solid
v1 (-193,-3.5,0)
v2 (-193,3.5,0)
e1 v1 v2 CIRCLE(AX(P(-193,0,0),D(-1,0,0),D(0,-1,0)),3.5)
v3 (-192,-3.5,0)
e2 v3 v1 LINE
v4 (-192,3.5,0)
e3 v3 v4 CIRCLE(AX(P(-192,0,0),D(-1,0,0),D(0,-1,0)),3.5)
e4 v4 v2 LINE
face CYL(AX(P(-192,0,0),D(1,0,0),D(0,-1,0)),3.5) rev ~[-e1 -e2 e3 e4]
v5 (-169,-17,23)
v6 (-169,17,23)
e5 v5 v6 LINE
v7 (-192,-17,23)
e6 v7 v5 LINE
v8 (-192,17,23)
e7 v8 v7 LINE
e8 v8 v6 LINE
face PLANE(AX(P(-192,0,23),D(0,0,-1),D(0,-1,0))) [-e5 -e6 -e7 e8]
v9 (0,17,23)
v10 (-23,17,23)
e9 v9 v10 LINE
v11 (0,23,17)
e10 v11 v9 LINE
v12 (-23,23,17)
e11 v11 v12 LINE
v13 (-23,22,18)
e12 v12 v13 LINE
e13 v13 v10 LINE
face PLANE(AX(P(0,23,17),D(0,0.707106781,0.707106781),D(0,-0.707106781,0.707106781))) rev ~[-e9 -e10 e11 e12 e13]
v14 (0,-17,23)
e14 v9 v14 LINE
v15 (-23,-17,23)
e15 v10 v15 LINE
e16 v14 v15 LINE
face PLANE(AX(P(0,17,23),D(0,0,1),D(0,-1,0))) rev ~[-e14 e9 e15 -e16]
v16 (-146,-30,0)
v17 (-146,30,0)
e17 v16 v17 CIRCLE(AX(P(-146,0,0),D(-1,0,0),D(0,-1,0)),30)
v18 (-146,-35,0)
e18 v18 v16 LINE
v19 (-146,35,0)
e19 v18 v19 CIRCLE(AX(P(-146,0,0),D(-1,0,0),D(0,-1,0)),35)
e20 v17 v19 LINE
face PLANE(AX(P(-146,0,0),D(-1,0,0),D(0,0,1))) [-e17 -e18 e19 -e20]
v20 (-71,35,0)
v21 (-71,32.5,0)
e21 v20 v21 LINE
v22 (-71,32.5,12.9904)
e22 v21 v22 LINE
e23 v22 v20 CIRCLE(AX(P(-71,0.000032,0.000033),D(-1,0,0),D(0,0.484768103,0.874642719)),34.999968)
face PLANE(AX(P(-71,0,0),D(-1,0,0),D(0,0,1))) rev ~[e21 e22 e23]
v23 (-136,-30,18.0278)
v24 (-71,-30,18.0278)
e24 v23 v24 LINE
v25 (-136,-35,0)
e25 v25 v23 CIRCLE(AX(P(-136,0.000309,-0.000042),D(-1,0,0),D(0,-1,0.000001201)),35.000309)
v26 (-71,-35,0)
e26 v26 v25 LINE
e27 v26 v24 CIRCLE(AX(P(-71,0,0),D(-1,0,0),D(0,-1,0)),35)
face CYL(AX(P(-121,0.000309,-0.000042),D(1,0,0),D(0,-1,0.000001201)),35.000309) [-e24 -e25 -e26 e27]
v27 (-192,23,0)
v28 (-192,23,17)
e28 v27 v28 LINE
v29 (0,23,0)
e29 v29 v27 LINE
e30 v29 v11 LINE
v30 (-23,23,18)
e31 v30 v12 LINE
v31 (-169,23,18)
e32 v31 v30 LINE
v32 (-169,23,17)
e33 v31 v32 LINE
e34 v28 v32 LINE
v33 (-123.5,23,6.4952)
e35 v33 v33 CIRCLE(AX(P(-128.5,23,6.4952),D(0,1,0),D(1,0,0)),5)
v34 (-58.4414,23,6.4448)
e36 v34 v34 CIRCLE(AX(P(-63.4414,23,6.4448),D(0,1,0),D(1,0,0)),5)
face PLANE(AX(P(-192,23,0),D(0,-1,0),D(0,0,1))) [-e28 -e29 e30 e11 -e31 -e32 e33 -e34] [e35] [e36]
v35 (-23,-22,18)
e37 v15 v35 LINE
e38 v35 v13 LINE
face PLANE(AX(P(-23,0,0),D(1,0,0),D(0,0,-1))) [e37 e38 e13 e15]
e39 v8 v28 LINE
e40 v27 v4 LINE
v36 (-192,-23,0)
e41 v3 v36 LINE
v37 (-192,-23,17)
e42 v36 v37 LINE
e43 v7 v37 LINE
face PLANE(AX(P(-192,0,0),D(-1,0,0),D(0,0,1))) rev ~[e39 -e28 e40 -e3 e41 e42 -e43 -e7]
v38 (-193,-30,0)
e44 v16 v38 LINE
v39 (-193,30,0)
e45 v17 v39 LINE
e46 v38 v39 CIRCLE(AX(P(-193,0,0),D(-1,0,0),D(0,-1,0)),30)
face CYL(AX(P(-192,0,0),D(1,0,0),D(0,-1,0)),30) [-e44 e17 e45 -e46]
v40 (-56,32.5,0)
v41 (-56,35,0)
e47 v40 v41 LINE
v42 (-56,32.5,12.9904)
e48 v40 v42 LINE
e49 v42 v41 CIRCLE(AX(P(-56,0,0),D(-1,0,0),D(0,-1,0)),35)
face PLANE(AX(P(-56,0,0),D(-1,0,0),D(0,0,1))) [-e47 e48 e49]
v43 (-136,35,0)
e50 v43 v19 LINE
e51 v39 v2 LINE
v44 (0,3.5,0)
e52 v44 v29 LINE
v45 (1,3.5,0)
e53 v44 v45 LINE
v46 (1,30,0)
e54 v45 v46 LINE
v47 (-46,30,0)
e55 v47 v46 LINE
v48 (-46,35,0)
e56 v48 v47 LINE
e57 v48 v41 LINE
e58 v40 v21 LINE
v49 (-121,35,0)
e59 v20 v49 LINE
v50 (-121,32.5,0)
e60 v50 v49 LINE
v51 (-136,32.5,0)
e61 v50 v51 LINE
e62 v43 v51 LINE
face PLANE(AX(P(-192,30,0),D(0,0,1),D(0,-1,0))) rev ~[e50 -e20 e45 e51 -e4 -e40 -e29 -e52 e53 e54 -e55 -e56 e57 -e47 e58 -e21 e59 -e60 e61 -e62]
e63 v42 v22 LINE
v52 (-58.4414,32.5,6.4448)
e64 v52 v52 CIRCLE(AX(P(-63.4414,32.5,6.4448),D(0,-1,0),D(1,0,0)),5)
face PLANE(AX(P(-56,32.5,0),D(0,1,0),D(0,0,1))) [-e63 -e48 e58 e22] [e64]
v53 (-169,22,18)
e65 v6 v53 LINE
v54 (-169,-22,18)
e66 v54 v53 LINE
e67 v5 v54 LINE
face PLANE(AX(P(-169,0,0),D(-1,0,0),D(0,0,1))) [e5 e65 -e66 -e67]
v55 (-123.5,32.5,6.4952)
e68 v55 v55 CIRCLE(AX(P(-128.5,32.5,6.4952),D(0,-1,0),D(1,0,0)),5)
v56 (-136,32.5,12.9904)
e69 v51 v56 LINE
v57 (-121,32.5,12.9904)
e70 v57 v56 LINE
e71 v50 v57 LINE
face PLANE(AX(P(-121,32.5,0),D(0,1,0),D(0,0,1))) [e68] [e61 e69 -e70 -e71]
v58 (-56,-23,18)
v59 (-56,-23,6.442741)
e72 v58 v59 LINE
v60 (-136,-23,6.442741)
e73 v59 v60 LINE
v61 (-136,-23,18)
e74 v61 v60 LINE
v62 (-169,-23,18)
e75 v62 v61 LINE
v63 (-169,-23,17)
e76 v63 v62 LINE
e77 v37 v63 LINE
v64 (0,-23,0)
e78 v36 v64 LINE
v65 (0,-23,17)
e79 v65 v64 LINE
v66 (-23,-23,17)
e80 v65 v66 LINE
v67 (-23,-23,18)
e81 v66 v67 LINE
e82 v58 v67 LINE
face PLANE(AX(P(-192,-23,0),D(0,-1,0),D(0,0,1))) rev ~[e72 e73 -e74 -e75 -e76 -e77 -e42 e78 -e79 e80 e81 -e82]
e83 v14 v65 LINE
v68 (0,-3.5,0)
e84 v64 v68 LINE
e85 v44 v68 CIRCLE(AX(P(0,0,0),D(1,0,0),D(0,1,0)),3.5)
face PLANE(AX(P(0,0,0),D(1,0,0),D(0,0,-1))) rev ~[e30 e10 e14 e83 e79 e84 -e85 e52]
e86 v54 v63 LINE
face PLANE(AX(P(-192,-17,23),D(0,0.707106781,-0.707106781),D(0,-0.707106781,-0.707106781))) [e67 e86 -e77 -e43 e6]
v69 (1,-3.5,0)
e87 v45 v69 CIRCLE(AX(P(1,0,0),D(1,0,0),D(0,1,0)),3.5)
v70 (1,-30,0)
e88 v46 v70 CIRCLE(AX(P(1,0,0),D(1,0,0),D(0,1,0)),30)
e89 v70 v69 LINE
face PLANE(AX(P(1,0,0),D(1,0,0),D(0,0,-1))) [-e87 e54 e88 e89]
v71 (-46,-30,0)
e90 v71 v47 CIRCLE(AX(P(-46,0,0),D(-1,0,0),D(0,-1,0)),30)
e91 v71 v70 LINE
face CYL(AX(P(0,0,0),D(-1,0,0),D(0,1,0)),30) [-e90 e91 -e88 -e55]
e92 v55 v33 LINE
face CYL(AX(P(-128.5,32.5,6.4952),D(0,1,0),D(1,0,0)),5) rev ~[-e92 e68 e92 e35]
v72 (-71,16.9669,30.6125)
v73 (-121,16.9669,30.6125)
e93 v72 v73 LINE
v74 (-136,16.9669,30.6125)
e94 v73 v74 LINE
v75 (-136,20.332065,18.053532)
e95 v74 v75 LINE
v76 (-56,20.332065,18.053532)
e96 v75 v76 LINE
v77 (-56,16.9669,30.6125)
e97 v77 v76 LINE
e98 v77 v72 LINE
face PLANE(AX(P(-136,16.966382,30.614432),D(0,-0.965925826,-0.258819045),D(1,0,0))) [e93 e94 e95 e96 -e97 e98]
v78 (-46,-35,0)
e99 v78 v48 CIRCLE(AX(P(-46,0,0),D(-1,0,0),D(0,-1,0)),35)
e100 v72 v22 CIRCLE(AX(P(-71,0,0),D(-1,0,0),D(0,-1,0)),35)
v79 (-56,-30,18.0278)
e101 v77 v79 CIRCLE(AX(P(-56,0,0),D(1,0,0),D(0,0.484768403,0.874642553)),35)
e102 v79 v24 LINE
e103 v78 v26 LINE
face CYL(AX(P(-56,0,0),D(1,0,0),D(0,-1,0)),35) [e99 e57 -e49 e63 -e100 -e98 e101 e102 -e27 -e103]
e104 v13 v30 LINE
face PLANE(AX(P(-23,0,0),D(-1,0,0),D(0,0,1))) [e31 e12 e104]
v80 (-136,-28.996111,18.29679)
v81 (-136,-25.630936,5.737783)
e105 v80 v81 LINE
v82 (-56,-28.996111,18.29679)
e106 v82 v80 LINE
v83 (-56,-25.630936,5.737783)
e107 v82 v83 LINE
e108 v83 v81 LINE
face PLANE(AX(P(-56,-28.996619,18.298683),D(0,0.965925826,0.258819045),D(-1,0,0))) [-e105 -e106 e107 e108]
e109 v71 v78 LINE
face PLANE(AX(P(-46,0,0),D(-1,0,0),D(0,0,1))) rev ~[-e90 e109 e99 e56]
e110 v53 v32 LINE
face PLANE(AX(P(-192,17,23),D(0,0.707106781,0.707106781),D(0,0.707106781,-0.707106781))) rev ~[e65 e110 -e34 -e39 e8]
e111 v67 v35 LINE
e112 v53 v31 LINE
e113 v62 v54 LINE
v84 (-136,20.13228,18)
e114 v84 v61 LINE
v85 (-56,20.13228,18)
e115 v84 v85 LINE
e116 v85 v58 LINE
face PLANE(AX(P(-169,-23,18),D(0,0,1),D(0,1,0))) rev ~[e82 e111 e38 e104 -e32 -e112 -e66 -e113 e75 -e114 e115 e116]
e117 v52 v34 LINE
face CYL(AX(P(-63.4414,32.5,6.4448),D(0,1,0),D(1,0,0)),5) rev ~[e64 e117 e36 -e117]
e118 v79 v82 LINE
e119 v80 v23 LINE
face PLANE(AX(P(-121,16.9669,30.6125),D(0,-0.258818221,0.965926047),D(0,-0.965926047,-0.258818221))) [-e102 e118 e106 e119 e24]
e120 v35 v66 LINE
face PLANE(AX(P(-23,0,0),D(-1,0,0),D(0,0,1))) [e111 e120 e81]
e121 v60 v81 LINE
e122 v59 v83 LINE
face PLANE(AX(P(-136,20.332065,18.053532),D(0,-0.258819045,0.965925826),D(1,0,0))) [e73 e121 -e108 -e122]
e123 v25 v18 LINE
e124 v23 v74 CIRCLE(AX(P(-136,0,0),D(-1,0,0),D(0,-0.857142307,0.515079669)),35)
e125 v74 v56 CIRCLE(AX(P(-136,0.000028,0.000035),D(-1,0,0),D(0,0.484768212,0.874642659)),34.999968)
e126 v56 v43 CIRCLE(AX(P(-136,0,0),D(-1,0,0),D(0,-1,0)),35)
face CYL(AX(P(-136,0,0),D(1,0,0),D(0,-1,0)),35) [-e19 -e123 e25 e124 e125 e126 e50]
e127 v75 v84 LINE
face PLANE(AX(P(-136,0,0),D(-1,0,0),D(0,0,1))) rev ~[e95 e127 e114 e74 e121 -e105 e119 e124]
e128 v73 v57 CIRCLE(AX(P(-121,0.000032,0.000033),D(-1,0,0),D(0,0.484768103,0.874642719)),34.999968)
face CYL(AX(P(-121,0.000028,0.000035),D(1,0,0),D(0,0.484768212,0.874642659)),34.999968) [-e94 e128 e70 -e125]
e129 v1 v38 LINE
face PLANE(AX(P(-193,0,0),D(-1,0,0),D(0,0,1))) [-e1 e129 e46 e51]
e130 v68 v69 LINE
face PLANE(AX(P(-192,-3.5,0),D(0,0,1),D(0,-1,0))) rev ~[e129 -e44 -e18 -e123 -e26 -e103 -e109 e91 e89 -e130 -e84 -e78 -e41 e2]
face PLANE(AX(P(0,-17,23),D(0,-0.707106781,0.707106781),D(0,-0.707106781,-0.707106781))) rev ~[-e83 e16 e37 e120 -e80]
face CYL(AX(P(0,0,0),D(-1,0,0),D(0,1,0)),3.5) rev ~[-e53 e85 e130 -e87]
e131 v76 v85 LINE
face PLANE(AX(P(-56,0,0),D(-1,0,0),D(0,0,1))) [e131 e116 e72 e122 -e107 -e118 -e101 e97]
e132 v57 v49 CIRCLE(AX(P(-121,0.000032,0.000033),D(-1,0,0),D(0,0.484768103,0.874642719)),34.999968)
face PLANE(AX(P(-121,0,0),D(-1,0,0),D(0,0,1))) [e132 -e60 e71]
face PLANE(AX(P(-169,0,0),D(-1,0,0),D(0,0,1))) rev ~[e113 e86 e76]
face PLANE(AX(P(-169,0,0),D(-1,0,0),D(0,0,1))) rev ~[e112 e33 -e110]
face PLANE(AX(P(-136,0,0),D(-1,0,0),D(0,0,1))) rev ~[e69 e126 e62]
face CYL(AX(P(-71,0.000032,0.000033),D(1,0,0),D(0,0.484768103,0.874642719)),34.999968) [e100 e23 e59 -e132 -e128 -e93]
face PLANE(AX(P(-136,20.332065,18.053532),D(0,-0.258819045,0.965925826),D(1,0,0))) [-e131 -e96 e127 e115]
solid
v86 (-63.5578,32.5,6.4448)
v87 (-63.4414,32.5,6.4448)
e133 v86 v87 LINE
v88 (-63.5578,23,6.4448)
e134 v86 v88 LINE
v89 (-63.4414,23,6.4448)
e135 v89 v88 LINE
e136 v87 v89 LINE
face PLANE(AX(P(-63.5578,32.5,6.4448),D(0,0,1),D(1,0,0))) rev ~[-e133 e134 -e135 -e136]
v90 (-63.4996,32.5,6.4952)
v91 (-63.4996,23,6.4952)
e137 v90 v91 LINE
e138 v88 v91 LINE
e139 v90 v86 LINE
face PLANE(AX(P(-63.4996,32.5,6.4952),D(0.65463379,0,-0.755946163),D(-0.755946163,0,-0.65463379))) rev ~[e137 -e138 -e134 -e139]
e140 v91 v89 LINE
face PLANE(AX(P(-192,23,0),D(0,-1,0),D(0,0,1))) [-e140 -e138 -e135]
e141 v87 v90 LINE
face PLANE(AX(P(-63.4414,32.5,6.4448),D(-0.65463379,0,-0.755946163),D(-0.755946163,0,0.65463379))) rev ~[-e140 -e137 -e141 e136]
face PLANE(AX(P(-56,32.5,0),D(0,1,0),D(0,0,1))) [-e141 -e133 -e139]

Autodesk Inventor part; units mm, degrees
ref_plane "YZ Plane" through (0, 0, 0) normal (1, 0, 0) x (0, 1, 0)
ref_plane "XZ Plane" through (0, 0, 0) normal (0, 1, 0) x (-1, 0, 0)
ref_plane "XY Plane" through (0, 0, 0) normal (0, 0, 1) x (1, 0, 0)
sketch "Skizze1" plane through (0, 0, 0) normal (1, 0, 0) x (0, 1, 0)
  arc A0 (30, 0) -> (-30, 0) centre (0, 0) ccw
  arc A1 (3.5, 0) -> (-3.5, 0) centre (0, 0) ccw
  line L0 (-30, 0) -> (-3.5, 0)
  line L1 (3.5, 0) -> (30, 0)
  dimension "d0" = 60
  dimension "d1" = 7
extrude "Motorloch R" add sketch "Skizze1" along normal blind 1
sketch "Skizze3" plane through (0, 0, 0) normal (-1, 0, 0) x (0, 0, 1)
  arc A0 (0, -30) -> (0, 30) centre (0, 0) ccw
  line L0 (0, 30) -> (0, -30)
extrude "Grundkörper R Teil A" add sketch "Skizze3" along normal blind 46
sketch "Skizze4" plane through (-46, 0, 0) normal (-1, 0, 0) x (0, 0, 1)
  arc A0 (0, -35) -> (0, 35) centre (0, 0) ccw
  line L0 (0, 35.8217) -> (0, -35)
  line L1 (0, 3.5) -> (0, 30) projected
  dimension "d8" = 70
extrude "Extrusion4" add sketch "Skizze4" along normal blind 10
sketch "Skizze5" plane through (-56, 0, 0) normal (-1, 0, 0) x (0, 0, 1)
  line L0 (0, -30) -> (0, -35) projected
  line L1 (0, 32.5) -> (0, -35)
  line L2 (0, 35) -> (0, 30) projected
  line L3 (0, 32.5) -> (12.9904, 32.5)
  arc A0 (0, -35) -> (0, 35) centre (0, 0) ccw projected
  line L4 (0, -35) -> (0, -30)
  line L5 (0, -30) -> (0, -3.5) projected
  line L6 (18.0278, -30) -> (30.6125, 16.9669)
  line L7 (18.0278, -30) -> (66.6515, -30) construction
  arc A1 (0, -35) -> (18.0278, -30) centre (0, 0) ccw
  arc A2 (30.6125, 16.9669) -> (12.9904, 32.5) centre (0, 0) ccw
  dimension "d11" = 75
extrude "Extrusion5" add sketch "Skizze5" along normal blind 15 contours L1 L3 A0 L6 L0
sketch "Skizze6" plane through (-71, 0, 0) normal (-1, 0, 0) x (0, 0, 1)
  line L0 (0, 32.5) -> (0, -35) projected
  line L1 (0, 35) -> (0, -35)
  line L2 (18.0278, -30) -> (30.6125, 16.9669) projected
  line L3 (30.6125, 16.9669) -> (18.0278, -30)
  arc A0 (0, -35) -> (18.0278, -30) centre (0, 0) ccw
  arc A1 (30.6125, 16.9669) -> (0, 35) centre (0, 0) ccw
extrude "Extrusion6" add sketch "Skizze6" along normal blind 50
sketch "Skizze8" plane through (-121, 0, 0) normal (-1, 0, 0) x (0, 0, 1)
  line L0 (0, 32.5) -> (0, -35)
  line L1 (0, -30) -> (0, -3.5) projected
  line L2 (30.6125, 16.9669) -> (18.0278, -30) projected
  line L3 (30.6125, 16.9669) -> (18.0278, -30)
  line L4 (0, 32.5) -> (12.9904, 32.5) projected
  line L5 (0, 32.5) -> (12.9904, 32.5)
  arc A0 (0, -35) -> (18.0278, -30) centre (0, 0) ccw
  arc A1 (30.6125, 16.9669) -> (12.9904, 32.5) centre (0, 0) ccw
extrude "Extrusion8" add sketch "Skizze8" along normal blind 15
sketch "Skizze9" plane through (-136, 0, 0) normal (-1, 0, 0) x (0, 0, 1)
  arc A0 (0, -35) -> (0, 35) centre (0, 0) ccw
  line L0 (0, 35) -> (0, -35)
  line L1 (0, -30) -> (0, -3.5) projected
extrude "Extrusion9" add sketch "Skizze9" along normal blind 10
sketch "Skizze10" plane through (-146, 0, 0) normal (-1, 0, 0) x (0, 0, 1)
  arc A0 (0, -30) -> (0, 30) centre (0, 0) ccw
  line L0 (0, -30) -> (0, -3.5) projected
  line L1 (0, 30) -> (0, -30)
extrude "Extrusion10" add sketch "Skizze10" along normal blind 46
sketch "Skizze12" plane through (1, 0, 0) normal (1, 0, 0) x (0, 0, -1)
  arc A0 (0, 30) -> (0, -30) centre (0, 0) ccw
  line L0 (0, -30) -> (0, -35) projected
  arc A1 (0, 3.5) -> (0, -3.5) centre (0, 0) ccw
  line L1 (0, -30) -> (0, -3.5)
  line L2 (0, 3.5) -> (0, 30)
extrude "Extrusion12" cut sketch "Skizze12" against normal blind 1
sketch "Skizze13" plane through (-192, 0, 0) normal (-1, 0, 0) x (0, 0, 1)
  line L0 (0, 0) -> (0, -23)
  line L1 (0, 30) -> (0, -30) projected
  line L2 (0, -23) -> (17, -23)
  line L3 (0, 0) -> (0, 23)
  line L4 (0, 23) -> (17, 23)
  line L5 (23, 0) -> (23, -17)
  line L6 (23, 0) -> (23, 17)
  line L7 (23, 17) -> (17, 23)
  line L8 (23, -17) -> (17, -23)
extrude "Extrusion13" cut sketch "Skizze13" against normal blind 23
sketch "Skizze14" plane through (0, 0, 0) normal (1, 0, 0) x (0, 0, -1)
  line L0 (0, -23) -> (0, 23) projected
  line L1 (0, 0) -> (0, 23)
  line L2 (0, 23) -> (-17, 23) projected
  line L3 (0, 23) -> (-17, 23)
  line L4 (-17, 23) -> (-23, 17)
  line L5 (-23, 17) -> (-23, -17) projected
  line L6 (-23, 17) -> (-23, -17)
  line L7 (-23, -17) -> (-17, -23)
  line L8 (-17, -23) -> (0, -23)
  line L9 (0, -23) -> (0, 0)
extrude "Extrusion14" cut sketch "Skizze14" against normal blind 23
sketch "Skizze16" plane through (-169, 0, 0) normal (-1, 0, 0) x (0, 0, 1)
  line L0 (0, -23) -> (0, -30) projected
  line L1 (0, -23) -> (18, -23)
  line L2 (18, -23) -> (18, 23)
  line L3 (18, 23) -> (0, 23)
  line L4 (0, 23) -> (0, -23)
  point P0 (0, 0)
  dimension "d40" = 18
  dimension "d41" = 46
extrude "Extrusion15" cut sketch "Skizze16" against normal blind 146
sketch "Skizze17" plane through (-136, 16.9669, 30.6125) normal (0, -0.258819, 0.9659258) x (1, 0, 0)
  line L0 (0, 0) -> (0, -48.6237) projected
  line L1 (80, 0) -> (80, -48.6237) projected
  line L2 (0, 0) -> (80, 0)
  line L3 (80, 0) -> (80, -47.5844)
  line L4 (80, -47.5844) -> (0, -47.5844)
  line L5 (0, -47.5844) -> (0, 0)
  point P0 (136, -24.3118)
extrude "Extrusion16" cut sketch "Skizze17" against normal blind 13
sketch "Skizze18" plane through (-56, 32.5, 12.9904) normal (0, 1, 0) x (1, 0, 0)
  line L0 (0, 0) -> (-15, 0) projected
  line L1 (10, 12.9904) -> (-90, 12.9904) projected
  line L2 (-80, 6.5456) -> (0, 6.5456) projected
  circle A0 centre (-7.4414, 6.5456) radius 5
  line L3 (-7.4996, 6.4952) -> (-7.5578, 6.5456)
  line L4 (-7.4414, 6.5456) -> (-7.4996, 6.4952)
  line L5 (-65, 12.9904) -> (-65, 0) projected
  circle A1 centre (-72.5, 6.4952) radius 5
  line L6 (-72.5, 6.4952) -> (-72.5582, 6.5456)
  line L7 (-72.4418, 6.5456) -> (-72.5, 6.4952)
  point P0 (56, 12.9904)
  dimension "d46" = 10
  dimension "d47" = 10
extrude "Extrusion17" cut sketch "Skizze18" against normal blind 13 contours L2 A1 | L6 L7 L2 A1 | L2 L7 L6 | L2 A0 | L3 L4 L2 A0
sketch "Skizze19" plane through (0, 0, 0) normal (1, 0, 0) x (0, 0, -1)
  arc A0 (0, 30) -> (0, -30) centre (0, 0) ccw
  line L0 (0, -23) -> (0, -30) projected
  arc A1 (0, 3.5) -> (0, -3.5) centre (0, 0) ccw
  line L1 (0, -30) -> (0, -3.5)
  line L2 (0, 3.5) -> (0, 30)
  dimension "d50" = 7
extrude "Extrusion18" add sketch "Skizze19" along normal blind 1
sketch "Skizze20" plane through (-192, 0, 0) normal (-1, 0, 0) x (0, 0, 1)
  arc A0 (0, -30) -> (0, 30) centre (0, 0) ccw projected
  arc A1 (0, -30) -> (0, 30) centre (0, 0) ccw
  arc A2 (0, -3.5) -> (0, 3.5) centre (0, 0) ccw
  line L0 (0, 35) -> (0, 30) projected
  line L1 (0, 30) -> (0, 3.5)
  line L2 (0, -3.5) -> (0, -30)
extrude "Extrusion19" add sketch "Skizze20" along normal blind 1
properties part number "ObereHaelfte"
